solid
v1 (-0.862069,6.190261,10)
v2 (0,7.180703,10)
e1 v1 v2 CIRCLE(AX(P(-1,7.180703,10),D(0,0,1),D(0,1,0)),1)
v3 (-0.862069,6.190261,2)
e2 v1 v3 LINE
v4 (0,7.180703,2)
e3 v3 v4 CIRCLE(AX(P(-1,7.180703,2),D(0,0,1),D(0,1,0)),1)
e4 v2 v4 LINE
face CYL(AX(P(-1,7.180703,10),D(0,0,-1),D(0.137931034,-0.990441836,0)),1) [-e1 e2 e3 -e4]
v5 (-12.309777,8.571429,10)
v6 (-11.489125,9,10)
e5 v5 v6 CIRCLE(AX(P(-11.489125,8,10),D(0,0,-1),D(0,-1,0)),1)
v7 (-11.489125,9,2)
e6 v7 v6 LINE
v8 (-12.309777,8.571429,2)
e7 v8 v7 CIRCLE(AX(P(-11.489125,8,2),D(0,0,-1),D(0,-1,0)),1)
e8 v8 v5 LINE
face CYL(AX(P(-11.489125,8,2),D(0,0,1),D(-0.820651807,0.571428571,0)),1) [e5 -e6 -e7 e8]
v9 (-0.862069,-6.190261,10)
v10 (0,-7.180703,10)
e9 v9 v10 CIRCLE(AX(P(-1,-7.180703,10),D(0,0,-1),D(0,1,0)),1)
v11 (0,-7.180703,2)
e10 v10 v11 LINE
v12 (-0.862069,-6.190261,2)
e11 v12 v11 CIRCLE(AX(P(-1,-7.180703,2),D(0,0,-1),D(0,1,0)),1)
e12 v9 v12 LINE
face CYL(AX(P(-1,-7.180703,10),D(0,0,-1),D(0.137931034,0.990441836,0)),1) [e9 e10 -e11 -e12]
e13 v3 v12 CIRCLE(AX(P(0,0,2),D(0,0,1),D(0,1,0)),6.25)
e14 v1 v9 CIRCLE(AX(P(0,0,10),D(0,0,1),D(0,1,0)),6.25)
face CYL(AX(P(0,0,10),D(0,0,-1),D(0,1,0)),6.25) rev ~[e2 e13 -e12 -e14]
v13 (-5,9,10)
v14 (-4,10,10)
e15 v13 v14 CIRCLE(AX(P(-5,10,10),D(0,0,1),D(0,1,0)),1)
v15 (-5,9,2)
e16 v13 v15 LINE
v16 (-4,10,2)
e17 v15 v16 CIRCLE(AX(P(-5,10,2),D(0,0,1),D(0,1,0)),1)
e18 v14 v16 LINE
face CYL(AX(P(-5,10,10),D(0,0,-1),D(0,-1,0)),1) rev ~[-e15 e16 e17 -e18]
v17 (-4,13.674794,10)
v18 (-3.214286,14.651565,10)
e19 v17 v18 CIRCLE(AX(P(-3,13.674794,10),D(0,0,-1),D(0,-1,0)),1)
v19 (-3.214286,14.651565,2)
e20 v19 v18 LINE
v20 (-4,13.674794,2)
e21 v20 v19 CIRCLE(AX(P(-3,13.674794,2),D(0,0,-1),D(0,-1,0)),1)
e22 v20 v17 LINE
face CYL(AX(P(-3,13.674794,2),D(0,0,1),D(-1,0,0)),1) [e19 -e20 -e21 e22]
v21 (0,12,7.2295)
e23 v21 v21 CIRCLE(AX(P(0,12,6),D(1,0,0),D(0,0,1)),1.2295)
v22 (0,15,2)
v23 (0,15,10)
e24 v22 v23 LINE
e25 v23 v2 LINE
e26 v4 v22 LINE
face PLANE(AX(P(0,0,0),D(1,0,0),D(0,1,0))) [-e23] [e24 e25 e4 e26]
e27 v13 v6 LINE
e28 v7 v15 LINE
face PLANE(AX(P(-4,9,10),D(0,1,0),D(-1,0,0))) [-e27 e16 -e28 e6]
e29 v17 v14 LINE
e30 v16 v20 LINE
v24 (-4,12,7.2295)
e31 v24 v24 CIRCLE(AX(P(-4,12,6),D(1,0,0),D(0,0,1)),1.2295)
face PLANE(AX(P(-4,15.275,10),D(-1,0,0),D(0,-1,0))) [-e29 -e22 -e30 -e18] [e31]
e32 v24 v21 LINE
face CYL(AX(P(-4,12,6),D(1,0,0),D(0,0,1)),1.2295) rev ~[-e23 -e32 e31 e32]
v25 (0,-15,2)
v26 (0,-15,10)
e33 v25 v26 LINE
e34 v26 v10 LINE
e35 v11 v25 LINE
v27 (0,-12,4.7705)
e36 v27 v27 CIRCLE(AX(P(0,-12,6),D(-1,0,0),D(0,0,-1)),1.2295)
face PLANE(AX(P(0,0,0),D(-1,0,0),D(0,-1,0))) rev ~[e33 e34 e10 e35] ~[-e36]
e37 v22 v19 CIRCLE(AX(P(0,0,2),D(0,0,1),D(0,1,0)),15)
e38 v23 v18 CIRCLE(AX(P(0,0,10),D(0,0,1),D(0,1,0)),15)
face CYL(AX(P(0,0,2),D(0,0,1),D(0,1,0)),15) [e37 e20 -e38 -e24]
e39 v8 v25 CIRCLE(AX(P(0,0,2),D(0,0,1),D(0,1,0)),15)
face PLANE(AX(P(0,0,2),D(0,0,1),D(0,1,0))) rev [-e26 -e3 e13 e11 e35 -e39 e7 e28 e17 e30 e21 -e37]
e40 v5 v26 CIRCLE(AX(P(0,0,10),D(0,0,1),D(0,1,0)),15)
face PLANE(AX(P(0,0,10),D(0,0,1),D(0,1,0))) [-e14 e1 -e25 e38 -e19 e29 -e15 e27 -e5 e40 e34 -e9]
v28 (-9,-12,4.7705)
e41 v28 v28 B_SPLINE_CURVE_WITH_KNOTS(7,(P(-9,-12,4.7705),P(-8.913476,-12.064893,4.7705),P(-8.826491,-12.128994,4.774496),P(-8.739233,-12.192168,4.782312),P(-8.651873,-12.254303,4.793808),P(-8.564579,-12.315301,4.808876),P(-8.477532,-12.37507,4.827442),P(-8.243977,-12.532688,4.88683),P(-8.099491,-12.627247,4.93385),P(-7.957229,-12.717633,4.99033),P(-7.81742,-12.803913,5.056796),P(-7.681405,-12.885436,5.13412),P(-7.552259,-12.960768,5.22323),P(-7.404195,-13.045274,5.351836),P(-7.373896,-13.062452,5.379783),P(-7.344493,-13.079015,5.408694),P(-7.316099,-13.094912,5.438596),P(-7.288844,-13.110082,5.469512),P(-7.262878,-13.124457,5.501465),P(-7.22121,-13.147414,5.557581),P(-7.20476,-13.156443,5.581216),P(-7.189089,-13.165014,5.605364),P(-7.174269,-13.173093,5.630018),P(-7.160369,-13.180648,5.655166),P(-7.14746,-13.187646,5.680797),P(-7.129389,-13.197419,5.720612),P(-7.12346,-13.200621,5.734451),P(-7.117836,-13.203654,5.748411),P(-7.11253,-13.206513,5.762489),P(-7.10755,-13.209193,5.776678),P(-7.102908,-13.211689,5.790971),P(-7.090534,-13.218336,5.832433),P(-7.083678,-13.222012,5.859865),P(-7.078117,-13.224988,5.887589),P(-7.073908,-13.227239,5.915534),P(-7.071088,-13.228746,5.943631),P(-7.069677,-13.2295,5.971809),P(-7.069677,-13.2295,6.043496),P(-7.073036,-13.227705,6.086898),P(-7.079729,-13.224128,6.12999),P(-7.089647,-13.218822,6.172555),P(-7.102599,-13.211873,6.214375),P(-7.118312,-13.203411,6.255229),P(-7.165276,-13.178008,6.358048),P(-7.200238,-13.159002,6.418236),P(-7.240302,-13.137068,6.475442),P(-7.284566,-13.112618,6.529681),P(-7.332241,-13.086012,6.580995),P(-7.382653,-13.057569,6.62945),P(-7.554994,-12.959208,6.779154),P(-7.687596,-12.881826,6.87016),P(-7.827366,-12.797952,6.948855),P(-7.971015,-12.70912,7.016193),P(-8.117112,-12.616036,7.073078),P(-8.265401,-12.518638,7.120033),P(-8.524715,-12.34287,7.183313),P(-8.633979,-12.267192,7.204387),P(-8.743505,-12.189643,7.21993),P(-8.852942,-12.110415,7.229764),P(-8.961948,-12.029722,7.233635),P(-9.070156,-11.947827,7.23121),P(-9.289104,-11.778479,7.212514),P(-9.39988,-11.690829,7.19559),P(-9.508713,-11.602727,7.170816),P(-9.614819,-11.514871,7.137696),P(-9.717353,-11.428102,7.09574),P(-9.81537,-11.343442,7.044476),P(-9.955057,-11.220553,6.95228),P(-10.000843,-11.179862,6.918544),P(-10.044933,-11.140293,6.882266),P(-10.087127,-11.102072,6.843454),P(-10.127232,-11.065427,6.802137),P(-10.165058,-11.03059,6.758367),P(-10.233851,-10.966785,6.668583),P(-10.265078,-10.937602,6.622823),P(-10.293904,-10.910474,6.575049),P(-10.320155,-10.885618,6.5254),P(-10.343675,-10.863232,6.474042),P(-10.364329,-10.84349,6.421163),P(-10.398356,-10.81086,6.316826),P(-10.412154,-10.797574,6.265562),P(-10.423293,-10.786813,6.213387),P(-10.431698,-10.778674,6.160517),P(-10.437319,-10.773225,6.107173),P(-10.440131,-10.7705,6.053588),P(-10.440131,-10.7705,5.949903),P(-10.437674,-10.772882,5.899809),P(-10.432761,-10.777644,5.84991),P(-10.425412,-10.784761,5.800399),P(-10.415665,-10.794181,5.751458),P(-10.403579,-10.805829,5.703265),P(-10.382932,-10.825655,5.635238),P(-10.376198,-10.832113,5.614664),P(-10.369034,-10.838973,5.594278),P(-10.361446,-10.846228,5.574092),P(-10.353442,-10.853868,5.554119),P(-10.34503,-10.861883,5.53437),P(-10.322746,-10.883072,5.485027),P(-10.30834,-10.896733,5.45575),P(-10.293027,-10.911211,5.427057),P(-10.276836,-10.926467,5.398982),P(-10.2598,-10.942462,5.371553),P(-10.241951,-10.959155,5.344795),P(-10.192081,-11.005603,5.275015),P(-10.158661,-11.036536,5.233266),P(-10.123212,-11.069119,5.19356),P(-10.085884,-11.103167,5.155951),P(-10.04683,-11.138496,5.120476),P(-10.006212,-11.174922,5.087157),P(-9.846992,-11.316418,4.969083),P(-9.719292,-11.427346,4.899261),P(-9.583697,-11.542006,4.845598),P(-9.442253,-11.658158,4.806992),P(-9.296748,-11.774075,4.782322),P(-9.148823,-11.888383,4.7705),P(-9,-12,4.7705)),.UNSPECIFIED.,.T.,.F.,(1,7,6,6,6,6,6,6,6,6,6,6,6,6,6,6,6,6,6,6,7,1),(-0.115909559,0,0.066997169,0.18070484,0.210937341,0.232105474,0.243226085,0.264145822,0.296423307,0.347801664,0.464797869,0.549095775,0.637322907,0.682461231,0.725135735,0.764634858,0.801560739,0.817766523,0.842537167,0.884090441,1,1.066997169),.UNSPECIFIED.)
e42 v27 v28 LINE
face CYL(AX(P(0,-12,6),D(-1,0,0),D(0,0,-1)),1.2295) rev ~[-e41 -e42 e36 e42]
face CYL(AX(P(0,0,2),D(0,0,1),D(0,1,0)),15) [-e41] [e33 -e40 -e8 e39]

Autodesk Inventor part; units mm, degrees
ref_plane "YZ Plane" through (0, 0, 0) normal (1, 0, 0) x (0, 1, 0)
ref_plane "XZ Plane" through (0, 0, 0) normal (0, 1, 0) x (-1, 0, 0)
ref_plane "XY Plane" through (0, 0, 0) normal (0, 0, 1) x (1, 0, 0)
sketch "スケッチ1" plane through (0, 0, 0) normal (1, 0, 0) x (0, 1, 0)
  line L0 (0, 0) -> (6.25, 0) construction
  line L1 (6.25, 0) -> (6.25, 2) construction
  line L2 (6.25, 2) -> (15, 2)
  line L3 (15, 2) -> (15, 10)
  line L4 (15, 10) -> (6.25, 10)
  line L5 (6.25, 10) -> (6.25, 2)
  line L6 (0, -2) -> (0, 12) projected
  dimension "d0" = 6.25
  dimension "d4" = 8.75
  dimension "d5" = 8
revolve "回転1" add sketch "スケッチ1" angle 180 about axis through (0, 0, -10) along (0, 0, 1)
sketch "スケッチ2" plane through (0, 6.25, 10) normal (0, 0, 1) x (1, 0, 0)
  line L0 (0, 8.75) -> (0, 2.75) construction
  line L1 (0, 0) -> (0, 8.75) projected
  line L2 (0, 2.75) -> (-4, 2.75) construction
  line L3 (-4, 2.75) -> (-12.5738, 2.75)
  line L4 (-12.5738, 2.75) -> (-12.5738, 9.025)
  line L5 (-12.5738, 9.025) -> (-4, 9.025)
  line L6 (-4, 9.025) -> (-4, 2.75)
  point P0 (0, -6.25)
  dimension "d7" = 6
  dimension "d8" = 4
extrude "押し出し1" cut sketch "スケッチ2" against normal through all
sketch "スケッチ4" plane through (0, -15, 2) normal (1, 0, 0) x (0, 0, -1)
  line L0 (-8, 0) -> (0, 0) projected
  line L1 (0, 0) -> (0, 8.75) projected
  point P0 (2, 15)
  point P1 (-4, 3)
  dimension "d20" = 3
  dimension "d28" = 4
hole "穴2" at (0, -12, 6) direction (-1, 0, 0) diameter 2.459 end through all thread size "M3x0.5" class "6H" standard "ANSI Metric M Profile"
fillet "フィレット2" radius 1 5 edges at (-4, 14.4568, 6) (-4, 9, 6) (-12, 9, 6) (0, 6.25, 6) (0, -6.25, 6)
sketch "スケッチ6" plane through (-4, 10, 10) normal (-1, 0, 0) x (0, 0, 1)
  line L0 (-8, 0) -> (-8, 3.6748) projected
  line L1 (-8, -1) -> (0, -1) projected
  point P0 (-10, -10)
  point P1 (-4, 2)
  dimension "d40" = 4
  dimension "d41" = 3
hole "穴4" at (-4, 12, 6) direction (1, 0, 0) diameter 2.459 end through all thread size "M3x0.5" class "6H" standard "ANSI Metric M Profile"
properties part number "clamp-ring" material "ステンレス鋼"
